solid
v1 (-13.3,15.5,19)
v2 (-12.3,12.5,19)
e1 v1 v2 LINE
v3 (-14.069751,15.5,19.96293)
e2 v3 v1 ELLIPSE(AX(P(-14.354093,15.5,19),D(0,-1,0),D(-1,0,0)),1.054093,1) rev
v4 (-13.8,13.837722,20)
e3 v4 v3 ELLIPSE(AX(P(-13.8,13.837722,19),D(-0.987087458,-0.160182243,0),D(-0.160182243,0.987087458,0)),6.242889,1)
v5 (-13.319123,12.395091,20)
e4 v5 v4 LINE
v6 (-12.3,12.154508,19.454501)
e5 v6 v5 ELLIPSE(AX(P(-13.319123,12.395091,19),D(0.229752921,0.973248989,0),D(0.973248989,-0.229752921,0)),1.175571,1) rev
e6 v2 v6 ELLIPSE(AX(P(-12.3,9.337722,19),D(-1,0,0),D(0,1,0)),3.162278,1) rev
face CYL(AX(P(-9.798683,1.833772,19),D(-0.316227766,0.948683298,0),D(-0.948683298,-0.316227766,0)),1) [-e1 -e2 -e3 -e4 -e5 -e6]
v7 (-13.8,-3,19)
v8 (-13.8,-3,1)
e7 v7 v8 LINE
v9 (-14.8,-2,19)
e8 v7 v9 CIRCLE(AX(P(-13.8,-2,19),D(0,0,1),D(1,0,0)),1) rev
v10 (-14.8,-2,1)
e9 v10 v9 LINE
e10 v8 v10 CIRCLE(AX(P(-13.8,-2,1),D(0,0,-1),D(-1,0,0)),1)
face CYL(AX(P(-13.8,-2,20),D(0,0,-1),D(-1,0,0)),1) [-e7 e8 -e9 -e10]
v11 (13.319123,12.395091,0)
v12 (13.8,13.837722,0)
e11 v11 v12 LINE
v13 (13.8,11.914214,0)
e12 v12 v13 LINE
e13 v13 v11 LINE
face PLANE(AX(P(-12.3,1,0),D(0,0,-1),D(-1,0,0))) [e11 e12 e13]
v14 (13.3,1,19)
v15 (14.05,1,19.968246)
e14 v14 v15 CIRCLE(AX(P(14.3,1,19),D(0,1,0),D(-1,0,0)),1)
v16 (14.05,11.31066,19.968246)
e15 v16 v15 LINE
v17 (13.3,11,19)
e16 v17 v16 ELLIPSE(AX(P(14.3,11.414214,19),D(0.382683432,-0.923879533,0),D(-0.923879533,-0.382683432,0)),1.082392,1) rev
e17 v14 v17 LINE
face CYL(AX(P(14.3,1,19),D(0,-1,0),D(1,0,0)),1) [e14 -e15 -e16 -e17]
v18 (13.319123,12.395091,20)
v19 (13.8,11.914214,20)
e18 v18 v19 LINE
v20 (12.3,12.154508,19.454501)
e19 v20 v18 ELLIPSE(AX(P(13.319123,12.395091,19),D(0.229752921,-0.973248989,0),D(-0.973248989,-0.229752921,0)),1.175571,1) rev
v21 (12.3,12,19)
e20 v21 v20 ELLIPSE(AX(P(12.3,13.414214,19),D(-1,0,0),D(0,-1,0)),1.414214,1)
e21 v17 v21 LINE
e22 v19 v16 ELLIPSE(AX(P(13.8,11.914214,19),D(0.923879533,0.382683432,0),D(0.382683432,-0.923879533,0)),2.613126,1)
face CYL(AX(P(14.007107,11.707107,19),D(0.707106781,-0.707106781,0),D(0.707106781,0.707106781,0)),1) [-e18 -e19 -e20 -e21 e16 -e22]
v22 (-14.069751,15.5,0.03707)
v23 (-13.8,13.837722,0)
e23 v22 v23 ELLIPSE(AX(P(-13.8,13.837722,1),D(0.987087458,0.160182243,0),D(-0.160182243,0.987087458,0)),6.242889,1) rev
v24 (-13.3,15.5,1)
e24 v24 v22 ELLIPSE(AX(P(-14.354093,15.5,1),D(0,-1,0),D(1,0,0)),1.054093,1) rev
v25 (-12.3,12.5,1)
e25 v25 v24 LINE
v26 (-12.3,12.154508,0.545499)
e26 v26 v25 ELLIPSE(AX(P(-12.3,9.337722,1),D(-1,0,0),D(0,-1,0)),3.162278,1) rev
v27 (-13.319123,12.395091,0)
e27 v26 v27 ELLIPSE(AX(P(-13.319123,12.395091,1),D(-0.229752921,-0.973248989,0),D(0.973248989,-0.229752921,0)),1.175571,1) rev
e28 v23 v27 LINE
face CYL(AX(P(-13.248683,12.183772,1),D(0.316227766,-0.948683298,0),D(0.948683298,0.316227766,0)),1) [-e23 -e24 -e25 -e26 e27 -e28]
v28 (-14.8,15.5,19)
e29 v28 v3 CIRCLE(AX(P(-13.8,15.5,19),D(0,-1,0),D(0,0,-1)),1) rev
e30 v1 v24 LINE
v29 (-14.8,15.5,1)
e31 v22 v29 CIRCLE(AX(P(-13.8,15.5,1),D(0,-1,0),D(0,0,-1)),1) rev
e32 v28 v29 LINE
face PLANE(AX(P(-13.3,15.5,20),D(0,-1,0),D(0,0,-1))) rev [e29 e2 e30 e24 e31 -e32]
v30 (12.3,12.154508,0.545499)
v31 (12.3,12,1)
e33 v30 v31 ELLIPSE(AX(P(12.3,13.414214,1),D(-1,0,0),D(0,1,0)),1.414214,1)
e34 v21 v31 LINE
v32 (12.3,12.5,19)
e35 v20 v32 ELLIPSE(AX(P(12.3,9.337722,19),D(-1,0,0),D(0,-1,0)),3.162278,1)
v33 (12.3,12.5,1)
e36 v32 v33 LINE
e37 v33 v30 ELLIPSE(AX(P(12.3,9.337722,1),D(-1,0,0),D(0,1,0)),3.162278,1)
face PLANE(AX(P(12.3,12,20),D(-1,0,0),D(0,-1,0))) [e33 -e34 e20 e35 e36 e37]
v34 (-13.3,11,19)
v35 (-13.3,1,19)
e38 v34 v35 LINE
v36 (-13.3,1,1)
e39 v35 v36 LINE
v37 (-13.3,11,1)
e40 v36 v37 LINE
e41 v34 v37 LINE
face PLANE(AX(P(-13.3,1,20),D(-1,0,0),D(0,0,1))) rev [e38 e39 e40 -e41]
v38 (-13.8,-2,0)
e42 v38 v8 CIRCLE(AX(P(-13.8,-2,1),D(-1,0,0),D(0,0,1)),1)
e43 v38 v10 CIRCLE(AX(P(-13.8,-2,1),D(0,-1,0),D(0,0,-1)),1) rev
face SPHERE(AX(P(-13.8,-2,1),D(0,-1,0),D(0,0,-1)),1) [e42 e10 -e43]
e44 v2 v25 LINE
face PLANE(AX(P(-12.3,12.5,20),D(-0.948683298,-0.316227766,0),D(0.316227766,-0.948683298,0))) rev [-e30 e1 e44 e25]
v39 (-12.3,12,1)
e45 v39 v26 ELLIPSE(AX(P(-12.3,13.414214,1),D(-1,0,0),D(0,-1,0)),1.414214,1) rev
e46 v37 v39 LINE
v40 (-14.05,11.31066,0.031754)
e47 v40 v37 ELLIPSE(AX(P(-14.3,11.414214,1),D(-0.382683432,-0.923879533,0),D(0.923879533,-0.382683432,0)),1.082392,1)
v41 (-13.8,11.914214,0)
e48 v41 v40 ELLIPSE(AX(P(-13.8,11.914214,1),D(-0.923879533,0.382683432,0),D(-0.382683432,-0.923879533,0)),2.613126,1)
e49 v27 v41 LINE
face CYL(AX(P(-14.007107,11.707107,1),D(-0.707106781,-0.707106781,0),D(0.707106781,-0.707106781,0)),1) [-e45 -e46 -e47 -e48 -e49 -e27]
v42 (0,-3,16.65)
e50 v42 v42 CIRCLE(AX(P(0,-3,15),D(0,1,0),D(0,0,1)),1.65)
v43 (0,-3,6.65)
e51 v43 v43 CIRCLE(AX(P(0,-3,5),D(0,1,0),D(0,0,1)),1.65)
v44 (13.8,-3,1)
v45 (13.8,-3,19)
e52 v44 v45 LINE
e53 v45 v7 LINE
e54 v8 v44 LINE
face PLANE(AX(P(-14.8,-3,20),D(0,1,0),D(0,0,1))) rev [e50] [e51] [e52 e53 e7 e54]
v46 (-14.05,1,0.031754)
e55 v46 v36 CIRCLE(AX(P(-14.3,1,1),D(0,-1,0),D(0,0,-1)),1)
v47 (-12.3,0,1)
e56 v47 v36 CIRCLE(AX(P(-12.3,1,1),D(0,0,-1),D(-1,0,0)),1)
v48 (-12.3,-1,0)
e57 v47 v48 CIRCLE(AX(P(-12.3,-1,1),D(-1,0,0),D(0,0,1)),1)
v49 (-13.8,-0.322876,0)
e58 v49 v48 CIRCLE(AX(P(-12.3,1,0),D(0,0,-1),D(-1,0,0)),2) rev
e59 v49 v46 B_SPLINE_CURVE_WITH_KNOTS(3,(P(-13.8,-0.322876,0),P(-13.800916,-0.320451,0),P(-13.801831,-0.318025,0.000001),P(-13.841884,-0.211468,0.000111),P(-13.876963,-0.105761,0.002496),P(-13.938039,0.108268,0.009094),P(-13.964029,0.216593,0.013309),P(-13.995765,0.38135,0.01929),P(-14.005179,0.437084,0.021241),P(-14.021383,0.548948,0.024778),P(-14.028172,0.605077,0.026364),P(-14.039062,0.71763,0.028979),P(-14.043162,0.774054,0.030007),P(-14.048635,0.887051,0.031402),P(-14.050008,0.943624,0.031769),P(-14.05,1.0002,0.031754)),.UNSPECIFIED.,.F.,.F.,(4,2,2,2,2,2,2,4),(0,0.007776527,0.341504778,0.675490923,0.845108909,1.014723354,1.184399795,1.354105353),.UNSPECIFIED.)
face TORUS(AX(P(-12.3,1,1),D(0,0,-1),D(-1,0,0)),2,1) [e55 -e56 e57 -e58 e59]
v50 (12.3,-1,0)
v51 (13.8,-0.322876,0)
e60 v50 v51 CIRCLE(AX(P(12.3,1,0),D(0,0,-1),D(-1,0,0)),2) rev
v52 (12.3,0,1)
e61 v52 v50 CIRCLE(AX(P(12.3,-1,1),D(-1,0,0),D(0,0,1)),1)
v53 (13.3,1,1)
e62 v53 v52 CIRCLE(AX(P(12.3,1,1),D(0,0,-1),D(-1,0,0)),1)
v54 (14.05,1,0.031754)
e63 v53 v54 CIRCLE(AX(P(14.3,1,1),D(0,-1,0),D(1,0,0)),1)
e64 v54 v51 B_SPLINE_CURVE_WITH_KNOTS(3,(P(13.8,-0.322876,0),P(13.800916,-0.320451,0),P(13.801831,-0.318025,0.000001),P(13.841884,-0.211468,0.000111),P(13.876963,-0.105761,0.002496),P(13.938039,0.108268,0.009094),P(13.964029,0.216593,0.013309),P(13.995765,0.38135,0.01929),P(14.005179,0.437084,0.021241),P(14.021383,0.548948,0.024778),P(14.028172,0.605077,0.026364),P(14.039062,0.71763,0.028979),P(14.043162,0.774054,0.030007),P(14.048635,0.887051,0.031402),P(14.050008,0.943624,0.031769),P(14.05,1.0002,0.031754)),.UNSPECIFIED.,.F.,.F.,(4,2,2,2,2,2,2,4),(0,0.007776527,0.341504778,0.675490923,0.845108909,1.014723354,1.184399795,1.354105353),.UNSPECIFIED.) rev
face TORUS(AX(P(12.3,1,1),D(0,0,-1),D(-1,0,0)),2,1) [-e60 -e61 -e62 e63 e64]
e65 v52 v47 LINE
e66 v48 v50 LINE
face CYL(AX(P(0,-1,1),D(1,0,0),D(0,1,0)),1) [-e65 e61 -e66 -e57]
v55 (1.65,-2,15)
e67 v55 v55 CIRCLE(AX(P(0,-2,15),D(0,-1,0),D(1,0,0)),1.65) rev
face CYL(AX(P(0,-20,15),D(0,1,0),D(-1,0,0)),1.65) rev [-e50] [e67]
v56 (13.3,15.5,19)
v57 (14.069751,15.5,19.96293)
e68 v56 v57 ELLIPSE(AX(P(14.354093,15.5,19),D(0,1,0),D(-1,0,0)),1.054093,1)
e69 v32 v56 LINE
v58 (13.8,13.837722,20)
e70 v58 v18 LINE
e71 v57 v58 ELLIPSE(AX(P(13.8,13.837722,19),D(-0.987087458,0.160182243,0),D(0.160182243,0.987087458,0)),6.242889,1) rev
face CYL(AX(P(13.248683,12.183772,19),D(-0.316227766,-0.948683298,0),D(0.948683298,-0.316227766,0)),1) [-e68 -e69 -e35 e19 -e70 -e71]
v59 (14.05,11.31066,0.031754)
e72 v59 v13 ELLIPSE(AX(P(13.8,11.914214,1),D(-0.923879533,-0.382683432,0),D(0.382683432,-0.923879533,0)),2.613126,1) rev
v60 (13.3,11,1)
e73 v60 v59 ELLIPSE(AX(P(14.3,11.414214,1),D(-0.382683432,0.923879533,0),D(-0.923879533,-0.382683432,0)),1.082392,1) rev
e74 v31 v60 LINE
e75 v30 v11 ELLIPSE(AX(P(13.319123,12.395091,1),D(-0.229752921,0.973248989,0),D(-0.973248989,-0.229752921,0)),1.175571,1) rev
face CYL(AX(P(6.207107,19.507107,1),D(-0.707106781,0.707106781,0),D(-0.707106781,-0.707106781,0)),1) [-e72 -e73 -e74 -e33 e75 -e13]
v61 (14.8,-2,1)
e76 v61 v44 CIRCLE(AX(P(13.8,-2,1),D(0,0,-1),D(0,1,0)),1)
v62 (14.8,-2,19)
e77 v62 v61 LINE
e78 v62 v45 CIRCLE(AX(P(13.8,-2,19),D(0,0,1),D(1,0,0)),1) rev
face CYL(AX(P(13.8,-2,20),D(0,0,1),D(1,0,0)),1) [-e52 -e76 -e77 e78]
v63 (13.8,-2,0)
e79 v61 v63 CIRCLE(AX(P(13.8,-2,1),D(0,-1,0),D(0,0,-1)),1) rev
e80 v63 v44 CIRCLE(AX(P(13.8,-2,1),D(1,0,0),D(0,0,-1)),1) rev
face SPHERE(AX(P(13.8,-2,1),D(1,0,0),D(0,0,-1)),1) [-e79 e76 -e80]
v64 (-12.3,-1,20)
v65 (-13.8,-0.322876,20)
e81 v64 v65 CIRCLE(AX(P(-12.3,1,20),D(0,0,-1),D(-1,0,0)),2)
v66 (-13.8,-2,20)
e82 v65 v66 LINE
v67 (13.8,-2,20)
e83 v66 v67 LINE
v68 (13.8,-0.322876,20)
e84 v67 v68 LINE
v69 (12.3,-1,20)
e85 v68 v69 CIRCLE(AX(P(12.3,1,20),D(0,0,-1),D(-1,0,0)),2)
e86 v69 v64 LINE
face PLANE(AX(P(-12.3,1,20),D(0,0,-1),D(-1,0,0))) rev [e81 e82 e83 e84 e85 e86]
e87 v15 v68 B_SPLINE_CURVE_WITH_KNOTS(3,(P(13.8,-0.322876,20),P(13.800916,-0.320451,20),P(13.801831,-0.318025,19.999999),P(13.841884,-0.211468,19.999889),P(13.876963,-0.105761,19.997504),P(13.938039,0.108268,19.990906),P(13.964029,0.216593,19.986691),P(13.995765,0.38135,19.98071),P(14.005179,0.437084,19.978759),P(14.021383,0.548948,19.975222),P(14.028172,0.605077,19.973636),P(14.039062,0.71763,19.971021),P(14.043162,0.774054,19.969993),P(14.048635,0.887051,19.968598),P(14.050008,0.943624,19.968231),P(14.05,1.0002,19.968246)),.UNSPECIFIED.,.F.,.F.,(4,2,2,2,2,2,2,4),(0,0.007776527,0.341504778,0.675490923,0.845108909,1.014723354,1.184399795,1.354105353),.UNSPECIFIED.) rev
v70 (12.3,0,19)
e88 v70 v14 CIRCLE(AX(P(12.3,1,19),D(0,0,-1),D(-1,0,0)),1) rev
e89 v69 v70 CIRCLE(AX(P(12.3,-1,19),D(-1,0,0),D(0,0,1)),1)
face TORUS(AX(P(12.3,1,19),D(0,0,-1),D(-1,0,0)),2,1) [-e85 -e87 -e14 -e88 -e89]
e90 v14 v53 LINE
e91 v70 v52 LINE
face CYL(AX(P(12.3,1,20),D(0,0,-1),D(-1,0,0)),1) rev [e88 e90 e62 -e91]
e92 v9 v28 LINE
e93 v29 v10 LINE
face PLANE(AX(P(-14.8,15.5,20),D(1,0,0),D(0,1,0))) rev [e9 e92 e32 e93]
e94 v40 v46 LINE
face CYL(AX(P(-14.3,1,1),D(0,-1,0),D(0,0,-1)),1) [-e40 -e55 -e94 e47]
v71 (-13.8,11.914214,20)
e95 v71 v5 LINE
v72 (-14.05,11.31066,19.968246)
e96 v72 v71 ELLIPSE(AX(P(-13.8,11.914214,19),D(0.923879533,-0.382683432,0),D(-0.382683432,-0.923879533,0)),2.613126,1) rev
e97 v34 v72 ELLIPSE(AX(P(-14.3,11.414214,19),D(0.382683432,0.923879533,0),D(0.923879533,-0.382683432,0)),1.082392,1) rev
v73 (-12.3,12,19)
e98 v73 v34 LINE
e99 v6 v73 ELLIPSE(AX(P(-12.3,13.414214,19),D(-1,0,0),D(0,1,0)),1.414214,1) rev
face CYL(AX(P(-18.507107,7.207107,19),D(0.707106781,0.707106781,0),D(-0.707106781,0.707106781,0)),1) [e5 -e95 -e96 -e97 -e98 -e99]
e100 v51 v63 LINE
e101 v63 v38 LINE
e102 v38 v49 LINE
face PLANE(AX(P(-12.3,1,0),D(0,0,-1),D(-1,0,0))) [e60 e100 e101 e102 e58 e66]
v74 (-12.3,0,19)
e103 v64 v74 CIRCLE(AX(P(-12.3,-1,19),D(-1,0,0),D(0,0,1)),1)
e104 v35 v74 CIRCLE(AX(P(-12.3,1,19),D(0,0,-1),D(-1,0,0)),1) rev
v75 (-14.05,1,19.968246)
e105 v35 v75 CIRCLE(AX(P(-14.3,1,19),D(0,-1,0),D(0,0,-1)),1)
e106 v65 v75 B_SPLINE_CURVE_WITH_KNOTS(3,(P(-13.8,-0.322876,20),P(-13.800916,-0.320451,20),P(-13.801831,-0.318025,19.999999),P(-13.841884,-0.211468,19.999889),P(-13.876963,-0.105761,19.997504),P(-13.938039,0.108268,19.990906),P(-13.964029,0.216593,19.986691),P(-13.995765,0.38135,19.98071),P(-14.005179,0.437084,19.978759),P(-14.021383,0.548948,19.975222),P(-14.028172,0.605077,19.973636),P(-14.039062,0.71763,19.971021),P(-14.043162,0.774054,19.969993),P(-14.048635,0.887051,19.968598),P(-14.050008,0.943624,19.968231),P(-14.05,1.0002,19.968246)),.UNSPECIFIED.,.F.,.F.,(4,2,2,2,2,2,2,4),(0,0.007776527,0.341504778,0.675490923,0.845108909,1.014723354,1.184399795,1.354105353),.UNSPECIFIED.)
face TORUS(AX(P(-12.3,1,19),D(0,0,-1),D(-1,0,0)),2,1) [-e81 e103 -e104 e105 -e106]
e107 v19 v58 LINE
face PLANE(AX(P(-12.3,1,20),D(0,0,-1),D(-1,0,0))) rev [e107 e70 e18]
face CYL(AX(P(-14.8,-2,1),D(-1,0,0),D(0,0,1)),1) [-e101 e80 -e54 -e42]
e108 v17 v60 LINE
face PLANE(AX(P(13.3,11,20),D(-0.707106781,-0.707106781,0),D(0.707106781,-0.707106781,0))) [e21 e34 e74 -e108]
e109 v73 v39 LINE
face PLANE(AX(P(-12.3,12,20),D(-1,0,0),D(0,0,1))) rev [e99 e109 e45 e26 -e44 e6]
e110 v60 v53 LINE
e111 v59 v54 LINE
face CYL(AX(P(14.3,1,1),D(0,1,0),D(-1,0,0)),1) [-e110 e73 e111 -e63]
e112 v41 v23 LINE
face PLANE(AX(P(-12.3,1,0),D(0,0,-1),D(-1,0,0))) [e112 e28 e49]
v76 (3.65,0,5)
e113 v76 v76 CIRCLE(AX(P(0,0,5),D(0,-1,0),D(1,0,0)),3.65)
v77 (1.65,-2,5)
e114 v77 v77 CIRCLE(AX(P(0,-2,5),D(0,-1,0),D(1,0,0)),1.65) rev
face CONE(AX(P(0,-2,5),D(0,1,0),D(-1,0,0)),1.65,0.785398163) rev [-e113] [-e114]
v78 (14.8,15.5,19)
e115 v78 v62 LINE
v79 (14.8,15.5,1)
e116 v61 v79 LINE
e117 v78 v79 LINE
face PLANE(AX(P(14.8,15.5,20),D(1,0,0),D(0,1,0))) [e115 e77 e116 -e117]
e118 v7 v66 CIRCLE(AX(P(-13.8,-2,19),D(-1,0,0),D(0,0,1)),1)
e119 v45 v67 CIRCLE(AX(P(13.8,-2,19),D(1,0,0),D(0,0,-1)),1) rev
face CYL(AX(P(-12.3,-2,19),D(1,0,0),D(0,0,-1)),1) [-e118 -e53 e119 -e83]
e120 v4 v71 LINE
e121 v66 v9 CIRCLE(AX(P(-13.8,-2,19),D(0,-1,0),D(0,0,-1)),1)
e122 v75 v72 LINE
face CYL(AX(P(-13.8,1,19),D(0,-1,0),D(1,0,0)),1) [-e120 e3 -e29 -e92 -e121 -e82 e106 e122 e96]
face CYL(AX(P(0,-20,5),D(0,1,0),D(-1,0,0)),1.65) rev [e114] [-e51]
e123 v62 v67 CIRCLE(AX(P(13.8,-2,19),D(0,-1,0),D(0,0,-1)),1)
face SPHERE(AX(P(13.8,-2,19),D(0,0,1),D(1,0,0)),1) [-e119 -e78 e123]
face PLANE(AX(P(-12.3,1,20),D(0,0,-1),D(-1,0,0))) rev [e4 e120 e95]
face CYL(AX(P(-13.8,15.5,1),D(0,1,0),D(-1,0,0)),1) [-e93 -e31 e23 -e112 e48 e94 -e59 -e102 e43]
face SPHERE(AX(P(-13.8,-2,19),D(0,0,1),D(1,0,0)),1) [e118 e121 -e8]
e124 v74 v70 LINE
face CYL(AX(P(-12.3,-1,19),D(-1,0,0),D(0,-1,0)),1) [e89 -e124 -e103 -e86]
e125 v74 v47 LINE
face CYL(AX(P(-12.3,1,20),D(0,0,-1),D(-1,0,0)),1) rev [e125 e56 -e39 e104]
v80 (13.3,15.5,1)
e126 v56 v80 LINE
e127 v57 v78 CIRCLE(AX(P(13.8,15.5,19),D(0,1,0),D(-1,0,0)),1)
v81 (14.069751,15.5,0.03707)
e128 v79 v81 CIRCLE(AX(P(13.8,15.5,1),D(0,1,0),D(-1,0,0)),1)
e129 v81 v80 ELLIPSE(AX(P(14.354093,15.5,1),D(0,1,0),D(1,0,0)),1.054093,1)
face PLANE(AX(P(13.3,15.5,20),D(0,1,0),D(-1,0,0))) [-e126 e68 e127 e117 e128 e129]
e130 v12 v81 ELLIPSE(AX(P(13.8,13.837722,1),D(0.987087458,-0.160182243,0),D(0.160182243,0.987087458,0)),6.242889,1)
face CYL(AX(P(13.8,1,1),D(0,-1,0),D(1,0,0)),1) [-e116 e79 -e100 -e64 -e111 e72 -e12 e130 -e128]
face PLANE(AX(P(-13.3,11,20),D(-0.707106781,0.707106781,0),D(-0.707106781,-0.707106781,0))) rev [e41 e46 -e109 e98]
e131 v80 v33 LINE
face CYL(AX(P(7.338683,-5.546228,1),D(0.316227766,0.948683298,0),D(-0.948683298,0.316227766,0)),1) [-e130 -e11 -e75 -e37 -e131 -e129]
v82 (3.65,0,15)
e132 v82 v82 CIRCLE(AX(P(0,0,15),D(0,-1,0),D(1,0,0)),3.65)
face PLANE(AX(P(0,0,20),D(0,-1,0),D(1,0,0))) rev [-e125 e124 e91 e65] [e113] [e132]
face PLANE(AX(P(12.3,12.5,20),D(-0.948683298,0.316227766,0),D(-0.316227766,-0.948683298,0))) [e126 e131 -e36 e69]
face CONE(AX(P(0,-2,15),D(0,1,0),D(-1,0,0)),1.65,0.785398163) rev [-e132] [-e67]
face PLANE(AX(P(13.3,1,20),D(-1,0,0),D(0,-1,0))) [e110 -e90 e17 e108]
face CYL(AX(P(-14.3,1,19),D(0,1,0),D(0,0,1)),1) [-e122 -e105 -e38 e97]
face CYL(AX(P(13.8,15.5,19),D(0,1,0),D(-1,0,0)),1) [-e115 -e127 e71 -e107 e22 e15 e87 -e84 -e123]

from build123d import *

# Parameters (mm, degrees)
BOSS_EXTRUDE1_DEPTH = 20
SKETCH2_R           = 1.65
CUT_EXTRUDE1_DEPTH  = 20
FILLET2_R           = 1
CHAMFER1_SIZE       = 2


with BuildPart() as part:
    # Sketch1 → Boss-Extrude1 (new body)
    with BuildSketch(Plane.XY):
        with BuildLine():
            Line((0, 0), (-12.3, 0))
            ThreePointArc((-12.3, 0), (-13.007106781, 0.292893219), (-13.3, 1))
            Line((-13.3, 1), (-13.3, 11))
            Line((-13.3, 11), (-12.3, 12))
            Line((-12.3, 12), (-12.3, 12.5))
            Line((-12.3, 12.5), (-13.3, 15.5))
            Line((-13.3, 15.5), (-14.8, 15.5))
            Line((-14.8, 15.5), (-14.8, -3))
            Line((-14.8, -3), (0, -3))
            Line((0, -3), (0, 0))
        make_face()
    boss_extrude1 = extrude(amount=BOSS_EXTRUDE1_DEPTH)

    # Mirror1: Boss-Extrude1 across plane
    add(boss_extrude1.mirror(Plane(origin=(0, 0, 20), x_dir=(0, 0, 1), z_dir=(-1, 0, 0))))

    # Sketch2 → Cut-Extrude1 (cut)
    with BuildSketch(Plane(origin=(0, 0, 0), x_dir=(1, 0, 0), z_dir=(0, 1, 0))):
        with Locations(Location((0, -5, 0), (0, 0, 180))):
            Circle(SKETCH2_R)
        with Locations(Location((0, -15, 0), (0, 0, 180))):
            Circle(SKETCH2_R)
    extrude(amount=-CUT_EXTRUDE1_DEPTH, mode=Mode.SUBTRACT)

    # Fillet2
    # the kernel refuses this fillet: 1 mm, written as the material it takes off along each edge
    with BuildSketch(Plane(origin=(-13.8, -2, 1), x_dir=(-1, 0, 0), z_dir=(0, 0, -1))) as fillet2_piece_1_section:
        Polygon((0, 0), (FILLET2_R, 0), (FILLET2_R, -FILLET2_R), (0, -FILLET2_R), align=None)
    fillet2_piece_1 = extrude(amount=FILLET2_R, mode=Mode.PRIVATE)
    fillet2_piece_1 = fillet2_piece_1 - Plane(origin=(-13.8, -2, 1), x_dir=(0.7071067811865475, 0.7071067811865475, 0), z_dir=(0, 0, -1)) * Sphere(FILLET2_R, mode=Mode.PRIVATE)
    add(fillet2_piece_1, mode=Mode.SUBTRACT)
    with BuildSketch(Plane(origin=(13.8, -2, 1), x_dir=(0, -1, 0), z_dir=(0, 0, -1))) as fillet2_piece_2_section:
        Polygon((0, 0), (FILLET2_R, 0), (FILLET2_R, -FILLET2_R), (0, -FILLET2_R), align=None)
    fillet2_piece_2 = extrude(amount=FILLET2_R, mode=Mode.PRIVATE)
    fillet2_piece_2 = fillet2_piece_2 - Plane(origin=(13.8, -2, 1), x_dir=(-0.7071067811865476, 0.7071067811865475, 0), z_dir=(0, 0, -1)) * Sphere(FILLET2_R, mode=Mode.PRIVATE)
    add(fillet2_piece_2, mode=Mode.SUBTRACT)
    with BuildSketch(Plane(origin=(13.8, -2, 19), x_dir=(0, -1, 0), z_dir=(0, 0, 1))) as fillet2_piece_3_section:
        Polygon((0, 0), (FILLET2_R, 0), (FILLET2_R, FILLET2_R), (0, FILLET2_R), align=None)
    fillet2_piece_3 = extrude(amount=FILLET2_R, mode=Mode.PRIVATE)
    fillet2_piece_3 = fillet2_piece_3 - Plane(origin=(13.8, -2, 19), x_dir=(-0.7071067811865476, 0.7071067811865475, 0), z_dir=(0, 0, 1)) * Sphere(FILLET2_R, mode=Mode.PRIVATE)
    add(fillet2_piece_3, mode=Mode.SUBTRACT)
    with BuildSketch(Plane(origin=(-13.8, -2, 19), x_dir=(-1, 0, 0), z_dir=(0, 0, 1))) as fillet2_piece_4_section:
        Polygon((0, 0), (FILLET2_R, 0), (FILLET2_R, FILLET2_R), (0, FILLET2_R), align=None)
    fillet2_piece_4 = extrude(amount=FILLET2_R, mode=Mode.PRIVATE)
    fillet2_piece_4 = fillet2_piece_4 - Plane(origin=(-13.8, -2, 19), x_dir=(0.7071067811865475, 0.7071067811865475, 0), z_dir=(0, 0, 1)) * Sphere(FILLET2_R, mode=Mode.PRIVATE)
    add(fillet2_piece_4, mode=Mode.SUBTRACT)
    with BuildSketch(Plane(origin=(-12.3, 1, 0), x_dir=(0, -1, 0), z_dir=(1, 0, 0))) as fillet2_piece_5:
        with BuildLine():
            CenterArc((1 + FILLET2_R, -FILLET2_R), FILLET2_R, 90, 90)
            Line((1 + FILLET2_R, 0), (1, 0))
            Line((1, 0), (1, -FILLET2_R))
        make_face()
    revolve(axis=Axis((-12.3, 1, 0), (0, 0, -1)), revolution_arc=90, mode=Mode.SUBTRACT)
    with BuildSketch(Plane(origin=(-13.3, 1, 0), x_dir=(-1, 0, 0), z_dir=(0, 1, 0))) as fillet2_piece_6_section:
        with BuildLine():
            CenterArc((FILLET2_R, FILLET2_R), FILLET2_R, 180, 90)
            Line((0, FILLET2_R), (0, 0))
            Line((0, 0), (FILLET2_R, 0))
        make_face()
    fillet2_piece_6 = extrude(amount=12.5, mode=Mode.PRIVATE)
    fillet2_piece_6 = split(fillet2_piece_6, bisect_by=Plane(origin=(-15.966229844, 8.333770156, 0.229204386), z_dir=(0.7071067811865476, -0.7071067811865476, 0)), keep=Keep.TOP, mode=Mode.PRIVATE)
    add(fillet2_piece_6, mode=Mode.SUBTRACT)
    with BuildSketch(Plane(origin=(-15.067766953, 9.232233047, 0), x_dir=(-0.7071067811865476, 0.7071067811865476, 0), z_dir=(0.7071067811865476, 0.7071067811865476, 0))) as fillet2_piece_7_section:
        with BuildLine():
            CenterArc((FILLET2_R, FILLET2_R), FILLET2_R, 180, 90)
            Line((0, FILLET2_R), (0, 0))
            Line((0, 0), (FILLET2_R, 0))
        make_face()
    fillet2_piece_7 = extrude(amount=6.414213562, mode=Mode.PRIVATE)
    fillet2_piece_7 = split(fillet2_piece_7, bisect_by=Plane(origin=(-13.3, 12.610644527, 0.233840359), z_dir=(1, 0, 0)), keep=Keep.TOP, mode=Mode.PRIVATE)
    add(fillet2_piece_7, mode=Mode.SUBTRACT)
    with BuildSketch(Plane(origin=(-11.509430585, 10.128291755, 0), x_dir=(-0.948683298050514, -0.31622776601683744, 0), z_dir=(-0.31622776601683744, 0.948683298050514, 0)), Plane(origin=(11.509430585, 10.128291755, 20), x_dir=(0.9486832980505141, -0.3162277660168372, 0), z_dir=(0.3162277660168372, 0.9486832980505141, 0))) as fillet2_piece_8:
        with BuildLine():
            CenterArc((FILLET2_R, FILLET2_R), FILLET2_R, 180, 90)
            Line((0, FILLET2_R), (0, 0))
            Line((0, 0), (FILLET2_R, 0))
        make_face()
    extrude(amount=8.16227766, mode=Mode.SUBTRACT)
    with BuildSketch(Plane(origin=(-14.8, 18, 0), x_dir=(1, 0, 0), z_dir=(0, -1, 0)), Plane(origin=(14.8, 18, 20), x_dir=(-1, 0, 0), z_dir=(0, -1, 0))) as fillet2_piece_9:
        with BuildLine():
            CenterArc((FILLET2_R, FILLET2_R), FILLET2_R, 180, 90)
            Line((0, FILLET2_R), (0, 0))
            Line((0, 0), (FILLET2_R, 0))
        make_face()
    extrude(amount=20, mode=Mode.SUBTRACT)
    with BuildSketch(Plane(origin=(13.8, -3, 0), x_dir=(0, 1, 0), z_dir=(-1, 0, 0)), Plane(origin=(-13.8, -3, 20), x_dir=(0, 1, 0), z_dir=(1, 0, 0))) as fillet2_piece_10:
        with BuildLine():
            CenterArc((FILLET2_R, -FILLET2_R), FILLET2_R, 90, 90)
            Line((0, -FILLET2_R), (0, 0))
            Line((0, 0), (FILLET2_R, 0))
        make_face()
    extrude(amount=27.6, mode=Mode.SUBTRACT)
    with BuildSketch(Plane(origin=(14.8, 18, 0), x_dir=(-1, 0, 0), z_dir=(0, -1, 0)), Plane(origin=(-14.8, 18, 20), x_dir=(1, 0, 0), z_dir=(0, -1, 0))) as fillet2_piece_11:
        with BuildLine():
            CenterArc((FILLET2_R, -FILLET2_R), FILLET2_R, 90, 90)
            Line((0, -FILLET2_R), (0, 0))
            Line((0, 0), (FILLET2_R, 0))
        make_face()
    extrude(amount=20, mode=Mode.SUBTRACT)
    with BuildSketch(Plane(origin=(11.509430585, 10.128291755, 0), x_dir=(0.9486832980505141, -0.3162277660168372, 0), z_dir=(0.3162277660168372, 0.9486832980505141, 0)), Plane(origin=(-11.509430585, 10.128291755, 20), x_dir=(-0.948683298050514, -0.31622776601683744, 0), z_dir=(-0.31622776601683744, 0.948683298050514, 0))) as fillet2_piece_12:
        with BuildLine():
            CenterArc((FILLET2_R, -FILLET2_R), FILLET2_R, 90, 90)
            Line((0, -FILLET2_R), (0, 0))
            Line((0, 0), (FILLET2_R, 0))
        make_face()
    extrude(amount=8.16227766, mode=Mode.SUBTRACT)
    with BuildSketch(Plane(origin=(15.067766953, 9.232233047, 0), x_dir=(0.7071067811865474, 0.7071067811865478, 0), z_dir=(-0.7071067811865478, 0.7071067811865474, 0))) as fillet2_piece_13_section:
        with BuildLine():
            CenterArc((FILLET2_R, -FILLET2_R), FILLET2_R, 90, 90)
            Line((0, -FILLET2_R), (0, 0))
            Line((0, 0), (FILLET2_R, 0))
        make_face()
    fillet2_piece_13 = extrude(amount=6.414213562, mode=Mode.PRIVATE)
    fillet2_piece_13 = split(fillet2_piece_13, bisect_by=Plane(origin=(13.3, 12.610644527, 0.233840359), z_dir=(-1, 0, 0)), keep=Keep.TOP, mode=Mode.PRIVATE)
    add(fillet2_piece_13, mode=Mode.SUBTRACT)
    with BuildSketch(Plane(origin=(15.067766953, 9.232233047, 20), x_dir=(0.7071067811865474, 0.7071067811865478, 0), z_dir=(-0.7071067811865478, 0.7071067811865474, 0))) as fillet2_piece_14_section:
        with BuildLine():
            CenterArc((FILLET2_R, FILLET2_R), FILLET2_R, 180, 90)
            Line((0, FILLET2_R), (0, 0))
            Line((0, 0), (FILLET2_R, 0))
        make_face()
    fillet2_piece_14 = extrude(amount=6.414213562, mode=Mode.PRIVATE)
    fillet2_piece_14 = split(fillet2_piece_14, bisect_by=Plane(origin=(13.3, 12.610644527, 19.766159641), z_dir=(-1, 0, 0)), keep=Keep.TOP, mode=Mode.PRIVATE)
    add(fillet2_piece_14, mode=Mode.SUBTRACT)
    with BuildSketch(Plane(origin=(13.3, 1, 0), x_dir=(1, 0, 0), z_dir=(0, 1, 0))) as fillet2_piece_15_section:
        with BuildLine():
            CenterArc((FILLET2_R, -FILLET2_R), FILLET2_R, 90, 90)
            Line((0, -FILLET2_R), (0, 0))
            Line((0, 0), (FILLET2_R, 0))
        make_face()
    fillet2_piece_15 = extrude(amount=12.5, mode=Mode.PRIVATE)
    fillet2_piece_15 = split(fillet2_piece_15, bisect_by=Plane(origin=(15.966229844, 8.333770156, 0.229204386), z_dir=(-0.7071067811865474, -0.7071067811865478, 0)), keep=Keep.TOP, mode=Mode.PRIVATE)
    add(fillet2_piece_15, mode=Mode.SUBTRACT)
    with BuildSketch(Plane(origin=(13.3, 1, 20), x_dir=(1, 0, 0), z_dir=(0, 1, 0))) as fillet2_piece_16_section:
        with BuildLine():
            CenterArc((FILLET2_R, FILLET2_R), FILLET2_R, 180, 90)
            Line((0, FILLET2_R), (0, 0))
            Line((0, 0), (FILLET2_R, 0))
        make_face()
    fillet2_piece_16 = extrude(amount=12.5, mode=Mode.PRIVATE)
    fillet2_piece_16 = split(fillet2_piece_16, bisect_by=Plane(origin=(15.966229844, 8.333770156, 19.770795614), z_dir=(-0.7071067811865474, -0.7071067811865478, 0)), keep=Keep.TOP, mode=Mode.PRIVATE)
    add(fillet2_piece_16, mode=Mode.SUBTRACT)
    with BuildSketch(Plane(origin=(12.3, 1, 0), x_dir=(0, -1, 0), z_dir=(-1, 0, 0))) as fillet2_piece_17:
        with BuildLine():
            CenterArc((1 + FILLET2_R, FILLET2_R), FILLET2_R, 180, 90)
            Line((1, FILLET2_R), (1, 0))
            Line((1, 0), (1 + FILLET2_R, 0))
        make_face()
    revolve(axis=Axis((12.3, 1, 0), (0, 0, 1)), revolution_arc=90, mode=Mode.SUBTRACT)
    with BuildSketch(Plane(origin=(12.3, 1, 20), x_dir=(0, -1, 0), z_dir=(-1, 0, 0))) as fillet2_piece_18:
        with BuildLine():
            CenterArc((1 + FILLET2_R, -FILLET2_R), FILLET2_R, 90, 90)
            Line((1, -FILLET2_R), (1, 0))
            Line((1, 0), (1 + FILLET2_R, 0))
        make_face()
    revolve(axis=Axis((12.3, 1, 20), (0, 0, 1)), revolution_arc=90, mode=Mode.SUBTRACT)
    with BuildSketch(Plane(origin=(12.3, 0, 0), x_dir=(0, 0, 1), z_dir=(-1, 0, 0)), Plane(origin=(-12.3, 0, 20), x_dir=(0, 0, -1), z_dir=(1, 0, 0))) as fillet2_piece_19:
        with BuildLine():
            CenterArc((FILLET2_R, -FILLET2_R), FILLET2_R, 90, 90)
            Line((0, -FILLET2_R), (0, 0))
            Line((0, 0), (FILLET2_R, 0))
        make_face()
    extrude(amount=24.6, mode=Mode.SUBTRACT)
    with BuildSketch(Plane(origin=(-15.067766953, 9.232233047, 20), x_dir=(-0.7071067811865476, 0.7071067811865476, 0), z_dir=(0.7071067811865476, 0.7071067811865476, 0))) as fillet2_piece_20_section:
        with BuildLine():
            CenterArc((FILLET2_R, -FILLET2_R), FILLET2_R, 90, 90)
            Line((0, -FILLET2_R), (0, 0))
            Line((0, 0), (FILLET2_R, 0))
        make_face()
    fillet2_piece_20 = extrude(amount=6.414213562, mode=Mode.PRIVATE)
    fillet2_piece_20 = split(fillet2_piece_20, bisect_by=Plane(origin=(-13.3, 12.610644527, 19.766159641), z_dir=(1, 0, 0)), keep=Keep.TOP, mode=Mode.PRIVATE)
    add(fillet2_piece_20, mode=Mode.SUBTRACT)
    with BuildSketch(Plane(origin=(-13.3, 1, 20), x_dir=(-1, 0, 0), z_dir=(0, 1, 0))) as fillet2_piece_21_section:
        with BuildLine():
            CenterArc((FILLET2_R, -FILLET2_R), FILLET2_R, 90, 90)
            Line((0, -FILLET2_R), (0, 0))
            Line((0, 0), (FILLET2_R, 0))
        make_face()
    fillet2_piece_21 = extrude(amount=12.5, mode=Mode.PRIVATE)
    fillet2_piece_21 = split(fillet2_piece_21, bisect_by=Plane(origin=(-15.966229844, 8.333770156, 19.770795614), z_dir=(0.7071067811865476, -0.7071067811865476, 0)), keep=Keep.TOP, mode=Mode.PRIVATE)
    add(fillet2_piece_21, mode=Mode.SUBTRACT)
    with BuildSketch(Plane(origin=(-12.3, 1, 20), x_dir=(0, -1, 0), z_dir=(1, 0, 0))) as fillet2_piece_22:
        with BuildLine():
            CenterArc((1 + FILLET2_R, FILLET2_R), FILLET2_R, 180, 90)
            Line((1 + FILLET2_R, 0), (1, 0))
            Line((1, 0), (1, FILLET2_R))
        make_face()
    revolve(axis=Axis((-12.3, 1, 20), (0, 0, -1)), revolution_arc=90, mode=Mode.SUBTRACT)
    with BuildSketch(Plane(origin=(14.8, -3, 1), x_dir=(-1, 0, 0), z_dir=(0, 0, 1)), Plane(origin=(-14.8, -3, 1), x_dir=(0, 1, 0), z_dir=(0, 0, 1))) as fillet2_piece_23:
        with BuildLine():
            CenterArc((FILLET2_R, -FILLET2_R), FILLET2_R, 90, 90)
            Line((0, -FILLET2_R), (0, 0))
            Line((0, 0), (FILLET2_R, 0))
        make_face()
    extrude(amount=18, mode=Mode.SUBTRACT)
    with BuildSketch(Plane(origin=(-13.3, 1, 0), x_dir=(-1, 0, 0), z_dir=(0, 1, 0))) as fillet2_piece_24a_section:
        with BuildLine():
            CenterArc((FILLET2_R, FILLET2_R), FILLET2_R, 180, 90)
            Line((0, FILLET2_R), (0, 0))
            Line((0, 0), (FILLET2_R, 0))
        make_face()
    fillet2_piece_24a = extrude(amount=12.5, mode=Mode.PRIVATE)
    fillet2_piece_24a = split(fillet2_piece_24a, bisect_by=Plane(origin=(-12.857581525, 11.442418475, 0.216324413), z_dir=(-0.7071067811865476, 0.7071067811865476, 0)), keep=Keep.TOP, mode=Mode.PRIVATE)
    with BuildSketch(Plane(origin=(-15.067766953, 9.232233047, 0), x_dir=(-0.7071067811865476, 0.7071067811865476, 0), z_dir=(0.7071067811865476, 0.7071067811865476, 0))) as fillet2_piece_24b_section:
        with BuildLine():
            CenterArc((FILLET2_R, FILLET2_R), FILLET2_R, 180, 90)
            Line((0, FILLET2_R), (0, 0))
            Line((0, 0), (FILLET2_R, 0))
        make_face()
    fillet2_piece_24b = extrude(amount=6.414213562, mode=Mode.PRIVATE)
    fillet2_piece_24b = split(fillet2_piece_24b, bisect_by=Plane(origin=(-13.3, 10.374325792, 0.216324413), z_dir=(-1, 0, 0)), keep=Keep.TOP, mode=Mode.PRIVATE)
    fillet2_piece_24 = fillet2_piece_24a & fillet2_piece_24b
    add(fillet2_piece_24, mode=Mode.SUBTRACT)
    with BuildSketch(Plane(origin=(15.067766953, 9.232233047, 0), x_dir=(0.7071067811865474, 0.7071067811865478, 0), z_dir=(-0.7071067811865478, 0.7071067811865474, 0))) as fillet2_piece_25a_section:
        with BuildLine():
            CenterArc((FILLET2_R, -FILLET2_R), FILLET2_R, 90, 90)
            Line((0, -FILLET2_R), (0, 0))
            Line((0, 0), (FILLET2_R, 0))
        make_face()
    fillet2_piece_25a = extrude(amount=6.414213562, mode=Mode.PRIVATE)
    fillet2_piece_25a = split(fillet2_piece_25a, bisect_by=Plane(origin=(13.3, 10.374325792, 0.216324413), z_dir=(1, 0, 0)), keep=Keep.TOP, mode=Mode.PRIVATE)
    with BuildSketch(Plane(origin=(13.3, 1, 0), x_dir=(1, 0, 0), z_dir=(0, 1, 0))) as fillet2_piece_25b_section:
        with BuildLine():
            CenterArc((FILLET2_R, -FILLET2_R), FILLET2_R, 90, 90)
            Line((0, -FILLET2_R), (0, 0))
            Line((0, 0), (FILLET2_R, 0))
        make_face()
    fillet2_piece_25b = extrude(amount=12.5, mode=Mode.PRIVATE)
    fillet2_piece_25b = split(fillet2_piece_25b, bisect_by=Plane(origin=(12.857581525, 11.442418475, 0.216324413), z_dir=(0.7071067811865474, 0.7071067811865478, 0)), keep=Keep.TOP, mode=Mode.PRIVATE)
    fillet2_piece_25 = fillet2_piece_25a & fillet2_piece_25b
    add(fillet2_piece_25, mode=Mode.SUBTRACT)
    with BuildSketch(Plane(origin=(15.067766953, 9.232233047, 20), x_dir=(0.7071067811865474, 0.7071067811865478, 0), z_dir=(-0.7071067811865478, 0.7071067811865474, 0))) as fillet2_piece_26a_section:
        with BuildLine():
            CenterArc((FILLET2_R, FILLET2_R), FILLET2_R, 180, 90)
            Line((0, FILLET2_R), (0, 0))
            Line((0, 0), (FILLET2_R, 0))
        make_face()
    fillet2_piece_26a = extrude(amount=6.414213562, mode=Mode.PRIVATE)
    fillet2_piece_26a = split(fillet2_piece_26a, bisect_by=Plane(origin=(13.3, 10.374325792, 19.783675587), z_dir=(1, 0, 0)), keep=Keep.TOP, mode=Mode.PRIVATE)
    with BuildSketch(Plane(origin=(13.3, 1, 20), x_dir=(1, 0, 0), z_dir=(0, 1, 0))) as fillet2_piece_26b_section:
        with BuildLine():
            CenterArc((FILLET2_R, FILLET2_R), FILLET2_R, 180, 90)
            Line((0, FILLET2_R), (0, 0))
            Line((0, 0), (FILLET2_R, 0))
        make_face()
    fillet2_piece_26b = extrude(amount=12.5, mode=Mode.PRIVATE)
    fillet2_piece_26b = split(fillet2_piece_26b, bisect_by=Plane(origin=(12.857581525, 11.442418475, 19.783675587), z_dir=(0.7071067811865474, 0.7071067811865478, 0)), keep=Keep.TOP, mode=Mode.PRIVATE)
    fillet2_piece_26 = fillet2_piece_26a & fillet2_piece_26b
    add(fillet2_piece_26, mode=Mode.SUBTRACT)
    with BuildSketch(Plane(origin=(-13.3, 1, 20), x_dir=(-1, 0, 0), z_dir=(0, 1, 0))) as fillet2_piece_27a_section:
        with BuildLine():
            CenterArc((FILLET2_R, -FILLET2_R), FILLET2_R, 90, 90)
            Line((0, -FILLET2_R), (0, 0))
            Line((0, 0), (FILLET2_R, 0))
        make_face()
    fillet2_piece_27a = extrude(amount=12.5, mode=Mode.PRIVATE)
    fillet2_piece_27a = split(fillet2_piece_27a, bisect_by=Plane(origin=(-12.857581525, 11.442418475, 19.783675587), z_dir=(-0.7071067811865476, 0.7071067811865476, 0)), keep=Keep.TOP, mode=Mode.PRIVATE)
    with BuildSketch(Plane(origin=(-15.067766953, 9.232233047, 20), x_dir=(-0.7071067811865476, 0.7071067811865476, 0), z_dir=(0.7071067811865476, 0.7071067811865476, 0))) as fillet2_piece_27b_section:
        with BuildLine():
            CenterArc((FILLET2_R, -FILLET2_R), FILLET2_R, 90, 90)
            Line((0, -FILLET2_R), (0, 0))
            Line((0, 0), (FILLET2_R, 0))
        make_face()
    fillet2_piece_27b = extrude(amount=6.414213562, mode=Mode.PRIVATE)
    fillet2_piece_27b = split(fillet2_piece_27b, bisect_by=Plane(origin=(-13.3, 10.374325792, 19.783675587), z_dir=(-1, 0, 0)), keep=Keep.TOP, mode=Mode.PRIVATE)
    fillet2_piece_27 = fillet2_piece_27a & fillet2_piece_27b
    add(fillet2_piece_27, mode=Mode.SUBTRACT)

    # Chamfer1
    chamfer1_edges = [part.edges().sort_by_distance(p)[0] for p in [
        (1.65, 0, 5),
        (1.65, 0, 15),
    ]]
    chamfer(chamfer1_edges, length=CHAMFER1_SIZE)


solid = part.part
